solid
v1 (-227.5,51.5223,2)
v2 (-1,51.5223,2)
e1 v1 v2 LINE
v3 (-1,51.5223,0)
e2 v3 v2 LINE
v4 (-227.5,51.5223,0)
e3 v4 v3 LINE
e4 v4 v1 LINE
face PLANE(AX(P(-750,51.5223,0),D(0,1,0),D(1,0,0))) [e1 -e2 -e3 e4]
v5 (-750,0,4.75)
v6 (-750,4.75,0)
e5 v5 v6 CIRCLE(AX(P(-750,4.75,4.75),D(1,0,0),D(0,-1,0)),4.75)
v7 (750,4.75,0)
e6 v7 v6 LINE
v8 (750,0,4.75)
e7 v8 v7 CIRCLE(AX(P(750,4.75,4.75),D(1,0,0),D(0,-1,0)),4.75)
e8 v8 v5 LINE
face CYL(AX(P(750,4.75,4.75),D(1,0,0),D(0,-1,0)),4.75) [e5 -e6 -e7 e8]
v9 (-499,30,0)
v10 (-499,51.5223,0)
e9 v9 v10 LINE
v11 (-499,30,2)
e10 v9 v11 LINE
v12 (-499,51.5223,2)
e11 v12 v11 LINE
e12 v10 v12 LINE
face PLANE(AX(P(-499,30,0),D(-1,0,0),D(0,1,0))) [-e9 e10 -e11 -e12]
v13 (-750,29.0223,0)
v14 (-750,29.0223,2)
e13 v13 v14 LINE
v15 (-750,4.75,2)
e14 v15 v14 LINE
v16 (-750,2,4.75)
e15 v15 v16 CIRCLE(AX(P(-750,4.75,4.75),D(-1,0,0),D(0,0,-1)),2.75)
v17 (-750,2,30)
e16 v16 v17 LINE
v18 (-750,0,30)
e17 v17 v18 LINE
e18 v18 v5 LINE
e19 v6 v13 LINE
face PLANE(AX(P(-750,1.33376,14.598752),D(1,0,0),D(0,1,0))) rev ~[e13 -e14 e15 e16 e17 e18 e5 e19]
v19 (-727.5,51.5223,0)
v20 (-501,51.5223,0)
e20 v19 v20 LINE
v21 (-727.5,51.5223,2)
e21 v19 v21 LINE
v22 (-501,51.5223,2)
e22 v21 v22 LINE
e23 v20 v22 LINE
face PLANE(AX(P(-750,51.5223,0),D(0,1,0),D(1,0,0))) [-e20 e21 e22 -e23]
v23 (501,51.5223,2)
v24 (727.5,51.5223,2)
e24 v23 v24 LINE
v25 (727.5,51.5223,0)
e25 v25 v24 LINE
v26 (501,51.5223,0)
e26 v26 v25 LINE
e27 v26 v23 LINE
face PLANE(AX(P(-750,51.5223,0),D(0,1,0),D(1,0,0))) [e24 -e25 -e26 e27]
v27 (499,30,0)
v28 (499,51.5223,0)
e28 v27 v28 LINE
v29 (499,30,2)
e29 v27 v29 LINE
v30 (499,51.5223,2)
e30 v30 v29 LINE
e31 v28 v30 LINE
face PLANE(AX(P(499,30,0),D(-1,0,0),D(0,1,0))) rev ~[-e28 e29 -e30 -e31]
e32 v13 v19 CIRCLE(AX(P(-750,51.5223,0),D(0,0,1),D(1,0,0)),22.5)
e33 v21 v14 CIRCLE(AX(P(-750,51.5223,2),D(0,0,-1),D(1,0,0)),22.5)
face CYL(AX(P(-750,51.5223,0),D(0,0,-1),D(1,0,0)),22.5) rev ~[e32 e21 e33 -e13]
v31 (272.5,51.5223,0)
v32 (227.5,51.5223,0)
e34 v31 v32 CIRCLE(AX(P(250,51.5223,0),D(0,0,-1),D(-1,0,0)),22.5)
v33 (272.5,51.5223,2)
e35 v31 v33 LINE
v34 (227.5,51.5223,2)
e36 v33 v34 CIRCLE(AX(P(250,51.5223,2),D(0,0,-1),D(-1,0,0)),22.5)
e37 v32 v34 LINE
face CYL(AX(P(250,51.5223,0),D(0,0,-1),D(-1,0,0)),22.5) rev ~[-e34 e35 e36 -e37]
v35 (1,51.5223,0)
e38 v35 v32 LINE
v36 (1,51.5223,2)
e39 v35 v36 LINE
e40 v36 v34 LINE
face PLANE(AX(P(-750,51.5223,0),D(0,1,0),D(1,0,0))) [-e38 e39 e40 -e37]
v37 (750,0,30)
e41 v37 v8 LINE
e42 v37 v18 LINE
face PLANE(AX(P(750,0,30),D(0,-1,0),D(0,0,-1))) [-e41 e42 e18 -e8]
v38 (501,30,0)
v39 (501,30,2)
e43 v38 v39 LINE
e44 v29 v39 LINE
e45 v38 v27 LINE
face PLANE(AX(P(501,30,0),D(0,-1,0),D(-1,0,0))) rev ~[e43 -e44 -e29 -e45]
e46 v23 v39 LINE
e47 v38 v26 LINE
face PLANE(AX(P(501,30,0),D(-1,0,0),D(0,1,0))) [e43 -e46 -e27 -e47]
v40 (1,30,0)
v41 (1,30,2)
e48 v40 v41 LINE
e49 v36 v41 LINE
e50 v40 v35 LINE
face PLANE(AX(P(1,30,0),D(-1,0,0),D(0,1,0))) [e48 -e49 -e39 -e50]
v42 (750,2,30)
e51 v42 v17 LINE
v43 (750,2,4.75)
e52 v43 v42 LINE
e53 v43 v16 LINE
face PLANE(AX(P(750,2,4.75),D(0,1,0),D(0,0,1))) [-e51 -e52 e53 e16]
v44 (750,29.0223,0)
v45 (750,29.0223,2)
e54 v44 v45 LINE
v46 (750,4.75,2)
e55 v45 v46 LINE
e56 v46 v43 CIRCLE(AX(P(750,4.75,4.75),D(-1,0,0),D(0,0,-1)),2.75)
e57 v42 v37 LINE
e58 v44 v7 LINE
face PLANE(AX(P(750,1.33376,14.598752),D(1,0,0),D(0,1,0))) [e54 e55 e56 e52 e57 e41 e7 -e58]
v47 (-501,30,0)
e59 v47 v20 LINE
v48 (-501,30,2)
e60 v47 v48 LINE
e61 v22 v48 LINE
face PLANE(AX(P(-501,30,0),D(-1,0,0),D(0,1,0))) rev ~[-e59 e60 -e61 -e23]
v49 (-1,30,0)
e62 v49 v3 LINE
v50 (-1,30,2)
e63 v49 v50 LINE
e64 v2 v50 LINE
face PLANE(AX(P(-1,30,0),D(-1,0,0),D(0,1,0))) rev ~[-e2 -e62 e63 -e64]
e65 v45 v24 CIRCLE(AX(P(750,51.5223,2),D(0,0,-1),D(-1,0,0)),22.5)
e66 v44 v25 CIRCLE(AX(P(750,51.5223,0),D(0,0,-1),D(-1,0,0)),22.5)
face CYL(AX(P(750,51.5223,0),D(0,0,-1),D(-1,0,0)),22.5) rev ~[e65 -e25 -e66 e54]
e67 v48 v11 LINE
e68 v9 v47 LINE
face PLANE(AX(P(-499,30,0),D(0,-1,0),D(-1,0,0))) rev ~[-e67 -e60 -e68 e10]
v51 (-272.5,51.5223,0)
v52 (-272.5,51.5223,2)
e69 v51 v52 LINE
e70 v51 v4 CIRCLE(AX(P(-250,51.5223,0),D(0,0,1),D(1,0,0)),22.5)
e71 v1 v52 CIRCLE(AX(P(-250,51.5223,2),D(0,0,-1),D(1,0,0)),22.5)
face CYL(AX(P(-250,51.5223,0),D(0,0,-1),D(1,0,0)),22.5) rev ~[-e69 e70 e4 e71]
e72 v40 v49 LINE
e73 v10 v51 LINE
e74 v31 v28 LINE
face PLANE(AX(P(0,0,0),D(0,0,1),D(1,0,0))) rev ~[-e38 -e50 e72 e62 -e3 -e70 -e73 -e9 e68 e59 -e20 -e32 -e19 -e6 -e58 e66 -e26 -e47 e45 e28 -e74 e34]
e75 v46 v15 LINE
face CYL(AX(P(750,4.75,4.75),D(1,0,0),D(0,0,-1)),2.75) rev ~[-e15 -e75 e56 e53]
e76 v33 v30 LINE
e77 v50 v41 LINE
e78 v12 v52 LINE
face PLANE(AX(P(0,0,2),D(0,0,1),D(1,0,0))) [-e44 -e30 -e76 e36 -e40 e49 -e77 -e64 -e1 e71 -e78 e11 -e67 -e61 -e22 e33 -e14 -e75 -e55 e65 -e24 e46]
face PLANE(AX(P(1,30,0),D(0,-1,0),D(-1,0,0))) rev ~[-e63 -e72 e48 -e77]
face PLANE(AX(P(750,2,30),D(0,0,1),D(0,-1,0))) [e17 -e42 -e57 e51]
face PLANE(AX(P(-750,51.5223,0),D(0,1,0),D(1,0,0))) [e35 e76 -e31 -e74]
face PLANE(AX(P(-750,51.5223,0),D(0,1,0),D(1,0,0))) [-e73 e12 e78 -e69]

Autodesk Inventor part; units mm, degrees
ref_plane "YZ Plane" through (0, 0, 0) normal (1, 0, 0) x (0, 1, 0)
ref_plane "XZ Plane" through (0, 0, 0) normal (0, 1, 0) x (-1, 0, 0)
ref_plane "XY Plane" through (0, 0, 0) normal (0, 0, 1) x (1, 0, 0)
sketch "Sketch1" plane through (0, 0, 0) normal (0, 0, 1) x (1, 0, 0)
  line L0 (-750, 51.5223) -> (750, 51.5223)
  line L1 (750, 51.5223) -> (750, 0)
  line L2 (750, 0) -> (-750, 0)
  line L3 (-750, 0) -> (-750, 51.5223)
  point P0 (0, 0)
  point P1 (0, 0)
  dimension "d0" = 1500
  dimension "d1" = 51.5224
extrude "Plate1" add sketch "Sketch1" along normal blind 2
sketch "Sketch2" plane through (750, 2, 0) normal (0, -1, 0) x (1, 0, 0)
  line L0 (-1500, 0) -> (0, 0)
  line L1 (0, 0) -> (0, 30)
  line L2 (0, 30) -> (-1500, 30)
  line L3 (-1500, 30) -> (-1500, 0)
edge flange "Flange1" height 30 angle 90 thickness 2 bend radius 2.75 thickness toward (0, -1, 0) relief round relief width 2 relief depth 1 edges at (0, 0, 2) wall of the first edge with corners at (-750, 2, 0) (750, 2, 0) (750, 2, 30) (-750, 2, 30)
bend "Bend1"
corner "Corner1"
sketch "Sketch5" plane through (0, 0, 0) normal (0, 0, -1) x (-1, 0, 0)
  line L0 (750, 51.5223) -> (-750, 51.5223) projected
  line L1 (-1, 30) -> (-1, 51.5223)
  line L2 (750, 0) -> (-750, 0) projected
  line L3 (-1, 30) -> (1, 30)
  line L4 (1, 30) -> (1, 51.5223)
  point P0 (0, 0)
  point P1 (0, 30)
  point P2 (0, 0)
  dimension "d27" = 2
  dimension "d28" = 30
extrude "Extrusion1" cut sketch "Sketch5" against normal through all
pattern_linear "Rectangular Pattern1" count 3 spacing 500 along (1, 0, 0) of "Extrusion1" first direction both ways yes
sketch "Sketch6" plane through (0, 0, 0) normal (0, 0, -1) x (-1, 0, 0)
  line L0 (-750, 51.5223) -> (-750, 4.75) projected
  circle A0 centre (-750, 51.5223) radius 22.5
  line L1 (-750, 51.5223) -> (750, 51.5223) projected
  line L2 (-1, 30) -> (-1, 51.5223) construction
  line L3 (-499, 51.5223) -> (-499, 30) construction
  line L4 (-499, 30) -> (-1, 30) construction
  circle A1 centre (-250, 51.5223) radius 22.5
  point P0 (0, 0)
  point P1 (-727.5, 51.5223)
  point P2 (-750, 29.0223)
  point P3 (-250, 30)
  point P4 (-227.5, 51.5223)
  point P5 (-272.5, 51.5223)
  dimension "d24" = 45
extrude "Extrusion2" cut sketch "Sketch6" against normal through all contours L1 A0 L0 | L1 A1 picked at (-748.3311, 36.7103) picked at (-248.2369, 40.5916)
mirror "Mirror1" about plane through (0, 0, 0) normal (1, 0, 0) of "Extrusion2"
sketch "Sketch7" plane through (0, 0, 2) normal (0, 0, 1) x (1, 0, 0)
  arc A0 (-750, 29.0223) -> (-727.5, 51.5223) centre (-750, 51.5223) ccw projected
  line L0 (-750, 4.75) -> (-750, 29.0223) projected
  line L1 (-750, 4.75) -> (750, 4.75) projected
  line L2 (750, 29.0223) -> (750, 4.75) projected
  arc A1 (727.5, 51.5223) -> (750, 29.0223) centre (750, 51.5223) ccw projected
  line L3 (501, 51.5223) -> (727.5, 51.5223) projected
  line L4 (501, 51.5223) -> (501, 30) projected
  line L5 (501, 30) -> (499, 30) projected
  line L6 (499, 30) -> (499, 51.5223) projected
  line L7 (1, 51.5223) -> (227.5, 51.5223) projected
  line L8 (1, 51.5223) -> (1, 30) projected
  line L9 (1, 30) -> (-1, 30) projected
  line L10 (-1, 30) -> (-1, 51.5223) projected
  line L11 (-499, 51.5223) -> (-272.5, 51.5223) projected
  line L12 (-499, 51.5223) -> (-499, 30) projected
  line L13 (-499, 30) -> (-501, 30) projected
  line L14 (-501, 30) -> (-501, 51.5223) projected
  line L15 (-727.5, 51.5223) -> (-501, 51.5223) projected
  line L16 (650, 4.75) -> (650, 51.5223) construction
  line L17 (-750, 4.75) -> (750, 4.75) projected
  line L18 (646, 24.6721) -> (650, 31.6003)
  line L19 (650, 31.6003) -> (654, 24.6721)
  line L20 (654, 24.6721) -> (646, 24.6721)
  line L21 (650, 31.6003) -> (650, 24.6721) construction
  line L22 (272.5, 51.5223) -> (499, 51.5223) projected
  arc A2 (227.5, 51.5223) -> (272.5, 51.5223) centre (250, 51.5223) ccw projected
  line L23 (-227.5, 51.5223) -> (-1, 51.5223) projected
  arc A3 (-272.5, 51.5223) -> (-227.5, 51.5223) centre (-250, 51.5223) ccw projected
  point P0 (0, 0)
  point P1 (650, 28.1362)
  dimension "d29" = 100
  dimension "d30" = 8
extrude "Extrusion3" [suppressed]
mirror "Mirror2" [suppressed]
sketch "Sketch8" plane through (0, 0, 2) normal (0, 0, 1) x (1, 0, 0)
  line L0 (494, 46.5223) -> (494, 34.5223) construction
  line L1 (494, 34.5223) -> (294, 34.5223) construction
  line L2 (294, 34.5223) -> (294, 46.5223) construction
  line L3 (294, 46.5223) -> (494, 46.5223) construction
  line L4 (501, 51.5223) -> (727.5, 51.5223) projected
  line L5 (272.5, 51.5223) -> (499, 51.5223) projected
  point P0 (0, 0)
  dimension "d35" = 200
  dimension "d36" = 12
  dimension "d39" = 5
  dimension "d40" = 5
mark "Mark1"
equation "\"d28\" = Стрингер_глубина_паза"
equation "\"d1\" = Стрингер_5"
equation "\"d27\" = d18"
equation "\"d2\" = Thickness"
equation "\"d3\" = BendReliefWidth"
equation "\"d4\" = BendReliefDepth"
equation "\"d5\" = MinimumRemnant"
equation "\"d6\" = TransitionRadius"
equation "\"d9\" = BendRadius"
equation "\"d10\" = CornerReliefSize"
equation "\"d11\" = GapSize"
equation "\"d12\" = JacobiRadiusSize"
equation "\"BendReliefWidth\" = Thickness"
equation "\"BendReliefDepth\" = 0.5 * Thickness"
equation "\"CornerReliefSize\" = 4 * Thickness"
equation "\"MinimumRemnant\" = 2 * Thickness"
equation "\"TransitionRadius\" = BendRadius"
equation "\"JacobiRadiusSize\" = BendRadius"
equation "\"GapSize\" = Thickness"
equation "\"d18\" = Thickness"
equation "\"Стрингер_5\" = 51.522347"
equation "\"Thickness\" = 2"
equation "\"BendRadius\" = 2.75"
equation "\"Стрингер_глубина_паза\" = 30"
properties part number "МОО 065 стрингер борт ###" material "Stainless Steel"
